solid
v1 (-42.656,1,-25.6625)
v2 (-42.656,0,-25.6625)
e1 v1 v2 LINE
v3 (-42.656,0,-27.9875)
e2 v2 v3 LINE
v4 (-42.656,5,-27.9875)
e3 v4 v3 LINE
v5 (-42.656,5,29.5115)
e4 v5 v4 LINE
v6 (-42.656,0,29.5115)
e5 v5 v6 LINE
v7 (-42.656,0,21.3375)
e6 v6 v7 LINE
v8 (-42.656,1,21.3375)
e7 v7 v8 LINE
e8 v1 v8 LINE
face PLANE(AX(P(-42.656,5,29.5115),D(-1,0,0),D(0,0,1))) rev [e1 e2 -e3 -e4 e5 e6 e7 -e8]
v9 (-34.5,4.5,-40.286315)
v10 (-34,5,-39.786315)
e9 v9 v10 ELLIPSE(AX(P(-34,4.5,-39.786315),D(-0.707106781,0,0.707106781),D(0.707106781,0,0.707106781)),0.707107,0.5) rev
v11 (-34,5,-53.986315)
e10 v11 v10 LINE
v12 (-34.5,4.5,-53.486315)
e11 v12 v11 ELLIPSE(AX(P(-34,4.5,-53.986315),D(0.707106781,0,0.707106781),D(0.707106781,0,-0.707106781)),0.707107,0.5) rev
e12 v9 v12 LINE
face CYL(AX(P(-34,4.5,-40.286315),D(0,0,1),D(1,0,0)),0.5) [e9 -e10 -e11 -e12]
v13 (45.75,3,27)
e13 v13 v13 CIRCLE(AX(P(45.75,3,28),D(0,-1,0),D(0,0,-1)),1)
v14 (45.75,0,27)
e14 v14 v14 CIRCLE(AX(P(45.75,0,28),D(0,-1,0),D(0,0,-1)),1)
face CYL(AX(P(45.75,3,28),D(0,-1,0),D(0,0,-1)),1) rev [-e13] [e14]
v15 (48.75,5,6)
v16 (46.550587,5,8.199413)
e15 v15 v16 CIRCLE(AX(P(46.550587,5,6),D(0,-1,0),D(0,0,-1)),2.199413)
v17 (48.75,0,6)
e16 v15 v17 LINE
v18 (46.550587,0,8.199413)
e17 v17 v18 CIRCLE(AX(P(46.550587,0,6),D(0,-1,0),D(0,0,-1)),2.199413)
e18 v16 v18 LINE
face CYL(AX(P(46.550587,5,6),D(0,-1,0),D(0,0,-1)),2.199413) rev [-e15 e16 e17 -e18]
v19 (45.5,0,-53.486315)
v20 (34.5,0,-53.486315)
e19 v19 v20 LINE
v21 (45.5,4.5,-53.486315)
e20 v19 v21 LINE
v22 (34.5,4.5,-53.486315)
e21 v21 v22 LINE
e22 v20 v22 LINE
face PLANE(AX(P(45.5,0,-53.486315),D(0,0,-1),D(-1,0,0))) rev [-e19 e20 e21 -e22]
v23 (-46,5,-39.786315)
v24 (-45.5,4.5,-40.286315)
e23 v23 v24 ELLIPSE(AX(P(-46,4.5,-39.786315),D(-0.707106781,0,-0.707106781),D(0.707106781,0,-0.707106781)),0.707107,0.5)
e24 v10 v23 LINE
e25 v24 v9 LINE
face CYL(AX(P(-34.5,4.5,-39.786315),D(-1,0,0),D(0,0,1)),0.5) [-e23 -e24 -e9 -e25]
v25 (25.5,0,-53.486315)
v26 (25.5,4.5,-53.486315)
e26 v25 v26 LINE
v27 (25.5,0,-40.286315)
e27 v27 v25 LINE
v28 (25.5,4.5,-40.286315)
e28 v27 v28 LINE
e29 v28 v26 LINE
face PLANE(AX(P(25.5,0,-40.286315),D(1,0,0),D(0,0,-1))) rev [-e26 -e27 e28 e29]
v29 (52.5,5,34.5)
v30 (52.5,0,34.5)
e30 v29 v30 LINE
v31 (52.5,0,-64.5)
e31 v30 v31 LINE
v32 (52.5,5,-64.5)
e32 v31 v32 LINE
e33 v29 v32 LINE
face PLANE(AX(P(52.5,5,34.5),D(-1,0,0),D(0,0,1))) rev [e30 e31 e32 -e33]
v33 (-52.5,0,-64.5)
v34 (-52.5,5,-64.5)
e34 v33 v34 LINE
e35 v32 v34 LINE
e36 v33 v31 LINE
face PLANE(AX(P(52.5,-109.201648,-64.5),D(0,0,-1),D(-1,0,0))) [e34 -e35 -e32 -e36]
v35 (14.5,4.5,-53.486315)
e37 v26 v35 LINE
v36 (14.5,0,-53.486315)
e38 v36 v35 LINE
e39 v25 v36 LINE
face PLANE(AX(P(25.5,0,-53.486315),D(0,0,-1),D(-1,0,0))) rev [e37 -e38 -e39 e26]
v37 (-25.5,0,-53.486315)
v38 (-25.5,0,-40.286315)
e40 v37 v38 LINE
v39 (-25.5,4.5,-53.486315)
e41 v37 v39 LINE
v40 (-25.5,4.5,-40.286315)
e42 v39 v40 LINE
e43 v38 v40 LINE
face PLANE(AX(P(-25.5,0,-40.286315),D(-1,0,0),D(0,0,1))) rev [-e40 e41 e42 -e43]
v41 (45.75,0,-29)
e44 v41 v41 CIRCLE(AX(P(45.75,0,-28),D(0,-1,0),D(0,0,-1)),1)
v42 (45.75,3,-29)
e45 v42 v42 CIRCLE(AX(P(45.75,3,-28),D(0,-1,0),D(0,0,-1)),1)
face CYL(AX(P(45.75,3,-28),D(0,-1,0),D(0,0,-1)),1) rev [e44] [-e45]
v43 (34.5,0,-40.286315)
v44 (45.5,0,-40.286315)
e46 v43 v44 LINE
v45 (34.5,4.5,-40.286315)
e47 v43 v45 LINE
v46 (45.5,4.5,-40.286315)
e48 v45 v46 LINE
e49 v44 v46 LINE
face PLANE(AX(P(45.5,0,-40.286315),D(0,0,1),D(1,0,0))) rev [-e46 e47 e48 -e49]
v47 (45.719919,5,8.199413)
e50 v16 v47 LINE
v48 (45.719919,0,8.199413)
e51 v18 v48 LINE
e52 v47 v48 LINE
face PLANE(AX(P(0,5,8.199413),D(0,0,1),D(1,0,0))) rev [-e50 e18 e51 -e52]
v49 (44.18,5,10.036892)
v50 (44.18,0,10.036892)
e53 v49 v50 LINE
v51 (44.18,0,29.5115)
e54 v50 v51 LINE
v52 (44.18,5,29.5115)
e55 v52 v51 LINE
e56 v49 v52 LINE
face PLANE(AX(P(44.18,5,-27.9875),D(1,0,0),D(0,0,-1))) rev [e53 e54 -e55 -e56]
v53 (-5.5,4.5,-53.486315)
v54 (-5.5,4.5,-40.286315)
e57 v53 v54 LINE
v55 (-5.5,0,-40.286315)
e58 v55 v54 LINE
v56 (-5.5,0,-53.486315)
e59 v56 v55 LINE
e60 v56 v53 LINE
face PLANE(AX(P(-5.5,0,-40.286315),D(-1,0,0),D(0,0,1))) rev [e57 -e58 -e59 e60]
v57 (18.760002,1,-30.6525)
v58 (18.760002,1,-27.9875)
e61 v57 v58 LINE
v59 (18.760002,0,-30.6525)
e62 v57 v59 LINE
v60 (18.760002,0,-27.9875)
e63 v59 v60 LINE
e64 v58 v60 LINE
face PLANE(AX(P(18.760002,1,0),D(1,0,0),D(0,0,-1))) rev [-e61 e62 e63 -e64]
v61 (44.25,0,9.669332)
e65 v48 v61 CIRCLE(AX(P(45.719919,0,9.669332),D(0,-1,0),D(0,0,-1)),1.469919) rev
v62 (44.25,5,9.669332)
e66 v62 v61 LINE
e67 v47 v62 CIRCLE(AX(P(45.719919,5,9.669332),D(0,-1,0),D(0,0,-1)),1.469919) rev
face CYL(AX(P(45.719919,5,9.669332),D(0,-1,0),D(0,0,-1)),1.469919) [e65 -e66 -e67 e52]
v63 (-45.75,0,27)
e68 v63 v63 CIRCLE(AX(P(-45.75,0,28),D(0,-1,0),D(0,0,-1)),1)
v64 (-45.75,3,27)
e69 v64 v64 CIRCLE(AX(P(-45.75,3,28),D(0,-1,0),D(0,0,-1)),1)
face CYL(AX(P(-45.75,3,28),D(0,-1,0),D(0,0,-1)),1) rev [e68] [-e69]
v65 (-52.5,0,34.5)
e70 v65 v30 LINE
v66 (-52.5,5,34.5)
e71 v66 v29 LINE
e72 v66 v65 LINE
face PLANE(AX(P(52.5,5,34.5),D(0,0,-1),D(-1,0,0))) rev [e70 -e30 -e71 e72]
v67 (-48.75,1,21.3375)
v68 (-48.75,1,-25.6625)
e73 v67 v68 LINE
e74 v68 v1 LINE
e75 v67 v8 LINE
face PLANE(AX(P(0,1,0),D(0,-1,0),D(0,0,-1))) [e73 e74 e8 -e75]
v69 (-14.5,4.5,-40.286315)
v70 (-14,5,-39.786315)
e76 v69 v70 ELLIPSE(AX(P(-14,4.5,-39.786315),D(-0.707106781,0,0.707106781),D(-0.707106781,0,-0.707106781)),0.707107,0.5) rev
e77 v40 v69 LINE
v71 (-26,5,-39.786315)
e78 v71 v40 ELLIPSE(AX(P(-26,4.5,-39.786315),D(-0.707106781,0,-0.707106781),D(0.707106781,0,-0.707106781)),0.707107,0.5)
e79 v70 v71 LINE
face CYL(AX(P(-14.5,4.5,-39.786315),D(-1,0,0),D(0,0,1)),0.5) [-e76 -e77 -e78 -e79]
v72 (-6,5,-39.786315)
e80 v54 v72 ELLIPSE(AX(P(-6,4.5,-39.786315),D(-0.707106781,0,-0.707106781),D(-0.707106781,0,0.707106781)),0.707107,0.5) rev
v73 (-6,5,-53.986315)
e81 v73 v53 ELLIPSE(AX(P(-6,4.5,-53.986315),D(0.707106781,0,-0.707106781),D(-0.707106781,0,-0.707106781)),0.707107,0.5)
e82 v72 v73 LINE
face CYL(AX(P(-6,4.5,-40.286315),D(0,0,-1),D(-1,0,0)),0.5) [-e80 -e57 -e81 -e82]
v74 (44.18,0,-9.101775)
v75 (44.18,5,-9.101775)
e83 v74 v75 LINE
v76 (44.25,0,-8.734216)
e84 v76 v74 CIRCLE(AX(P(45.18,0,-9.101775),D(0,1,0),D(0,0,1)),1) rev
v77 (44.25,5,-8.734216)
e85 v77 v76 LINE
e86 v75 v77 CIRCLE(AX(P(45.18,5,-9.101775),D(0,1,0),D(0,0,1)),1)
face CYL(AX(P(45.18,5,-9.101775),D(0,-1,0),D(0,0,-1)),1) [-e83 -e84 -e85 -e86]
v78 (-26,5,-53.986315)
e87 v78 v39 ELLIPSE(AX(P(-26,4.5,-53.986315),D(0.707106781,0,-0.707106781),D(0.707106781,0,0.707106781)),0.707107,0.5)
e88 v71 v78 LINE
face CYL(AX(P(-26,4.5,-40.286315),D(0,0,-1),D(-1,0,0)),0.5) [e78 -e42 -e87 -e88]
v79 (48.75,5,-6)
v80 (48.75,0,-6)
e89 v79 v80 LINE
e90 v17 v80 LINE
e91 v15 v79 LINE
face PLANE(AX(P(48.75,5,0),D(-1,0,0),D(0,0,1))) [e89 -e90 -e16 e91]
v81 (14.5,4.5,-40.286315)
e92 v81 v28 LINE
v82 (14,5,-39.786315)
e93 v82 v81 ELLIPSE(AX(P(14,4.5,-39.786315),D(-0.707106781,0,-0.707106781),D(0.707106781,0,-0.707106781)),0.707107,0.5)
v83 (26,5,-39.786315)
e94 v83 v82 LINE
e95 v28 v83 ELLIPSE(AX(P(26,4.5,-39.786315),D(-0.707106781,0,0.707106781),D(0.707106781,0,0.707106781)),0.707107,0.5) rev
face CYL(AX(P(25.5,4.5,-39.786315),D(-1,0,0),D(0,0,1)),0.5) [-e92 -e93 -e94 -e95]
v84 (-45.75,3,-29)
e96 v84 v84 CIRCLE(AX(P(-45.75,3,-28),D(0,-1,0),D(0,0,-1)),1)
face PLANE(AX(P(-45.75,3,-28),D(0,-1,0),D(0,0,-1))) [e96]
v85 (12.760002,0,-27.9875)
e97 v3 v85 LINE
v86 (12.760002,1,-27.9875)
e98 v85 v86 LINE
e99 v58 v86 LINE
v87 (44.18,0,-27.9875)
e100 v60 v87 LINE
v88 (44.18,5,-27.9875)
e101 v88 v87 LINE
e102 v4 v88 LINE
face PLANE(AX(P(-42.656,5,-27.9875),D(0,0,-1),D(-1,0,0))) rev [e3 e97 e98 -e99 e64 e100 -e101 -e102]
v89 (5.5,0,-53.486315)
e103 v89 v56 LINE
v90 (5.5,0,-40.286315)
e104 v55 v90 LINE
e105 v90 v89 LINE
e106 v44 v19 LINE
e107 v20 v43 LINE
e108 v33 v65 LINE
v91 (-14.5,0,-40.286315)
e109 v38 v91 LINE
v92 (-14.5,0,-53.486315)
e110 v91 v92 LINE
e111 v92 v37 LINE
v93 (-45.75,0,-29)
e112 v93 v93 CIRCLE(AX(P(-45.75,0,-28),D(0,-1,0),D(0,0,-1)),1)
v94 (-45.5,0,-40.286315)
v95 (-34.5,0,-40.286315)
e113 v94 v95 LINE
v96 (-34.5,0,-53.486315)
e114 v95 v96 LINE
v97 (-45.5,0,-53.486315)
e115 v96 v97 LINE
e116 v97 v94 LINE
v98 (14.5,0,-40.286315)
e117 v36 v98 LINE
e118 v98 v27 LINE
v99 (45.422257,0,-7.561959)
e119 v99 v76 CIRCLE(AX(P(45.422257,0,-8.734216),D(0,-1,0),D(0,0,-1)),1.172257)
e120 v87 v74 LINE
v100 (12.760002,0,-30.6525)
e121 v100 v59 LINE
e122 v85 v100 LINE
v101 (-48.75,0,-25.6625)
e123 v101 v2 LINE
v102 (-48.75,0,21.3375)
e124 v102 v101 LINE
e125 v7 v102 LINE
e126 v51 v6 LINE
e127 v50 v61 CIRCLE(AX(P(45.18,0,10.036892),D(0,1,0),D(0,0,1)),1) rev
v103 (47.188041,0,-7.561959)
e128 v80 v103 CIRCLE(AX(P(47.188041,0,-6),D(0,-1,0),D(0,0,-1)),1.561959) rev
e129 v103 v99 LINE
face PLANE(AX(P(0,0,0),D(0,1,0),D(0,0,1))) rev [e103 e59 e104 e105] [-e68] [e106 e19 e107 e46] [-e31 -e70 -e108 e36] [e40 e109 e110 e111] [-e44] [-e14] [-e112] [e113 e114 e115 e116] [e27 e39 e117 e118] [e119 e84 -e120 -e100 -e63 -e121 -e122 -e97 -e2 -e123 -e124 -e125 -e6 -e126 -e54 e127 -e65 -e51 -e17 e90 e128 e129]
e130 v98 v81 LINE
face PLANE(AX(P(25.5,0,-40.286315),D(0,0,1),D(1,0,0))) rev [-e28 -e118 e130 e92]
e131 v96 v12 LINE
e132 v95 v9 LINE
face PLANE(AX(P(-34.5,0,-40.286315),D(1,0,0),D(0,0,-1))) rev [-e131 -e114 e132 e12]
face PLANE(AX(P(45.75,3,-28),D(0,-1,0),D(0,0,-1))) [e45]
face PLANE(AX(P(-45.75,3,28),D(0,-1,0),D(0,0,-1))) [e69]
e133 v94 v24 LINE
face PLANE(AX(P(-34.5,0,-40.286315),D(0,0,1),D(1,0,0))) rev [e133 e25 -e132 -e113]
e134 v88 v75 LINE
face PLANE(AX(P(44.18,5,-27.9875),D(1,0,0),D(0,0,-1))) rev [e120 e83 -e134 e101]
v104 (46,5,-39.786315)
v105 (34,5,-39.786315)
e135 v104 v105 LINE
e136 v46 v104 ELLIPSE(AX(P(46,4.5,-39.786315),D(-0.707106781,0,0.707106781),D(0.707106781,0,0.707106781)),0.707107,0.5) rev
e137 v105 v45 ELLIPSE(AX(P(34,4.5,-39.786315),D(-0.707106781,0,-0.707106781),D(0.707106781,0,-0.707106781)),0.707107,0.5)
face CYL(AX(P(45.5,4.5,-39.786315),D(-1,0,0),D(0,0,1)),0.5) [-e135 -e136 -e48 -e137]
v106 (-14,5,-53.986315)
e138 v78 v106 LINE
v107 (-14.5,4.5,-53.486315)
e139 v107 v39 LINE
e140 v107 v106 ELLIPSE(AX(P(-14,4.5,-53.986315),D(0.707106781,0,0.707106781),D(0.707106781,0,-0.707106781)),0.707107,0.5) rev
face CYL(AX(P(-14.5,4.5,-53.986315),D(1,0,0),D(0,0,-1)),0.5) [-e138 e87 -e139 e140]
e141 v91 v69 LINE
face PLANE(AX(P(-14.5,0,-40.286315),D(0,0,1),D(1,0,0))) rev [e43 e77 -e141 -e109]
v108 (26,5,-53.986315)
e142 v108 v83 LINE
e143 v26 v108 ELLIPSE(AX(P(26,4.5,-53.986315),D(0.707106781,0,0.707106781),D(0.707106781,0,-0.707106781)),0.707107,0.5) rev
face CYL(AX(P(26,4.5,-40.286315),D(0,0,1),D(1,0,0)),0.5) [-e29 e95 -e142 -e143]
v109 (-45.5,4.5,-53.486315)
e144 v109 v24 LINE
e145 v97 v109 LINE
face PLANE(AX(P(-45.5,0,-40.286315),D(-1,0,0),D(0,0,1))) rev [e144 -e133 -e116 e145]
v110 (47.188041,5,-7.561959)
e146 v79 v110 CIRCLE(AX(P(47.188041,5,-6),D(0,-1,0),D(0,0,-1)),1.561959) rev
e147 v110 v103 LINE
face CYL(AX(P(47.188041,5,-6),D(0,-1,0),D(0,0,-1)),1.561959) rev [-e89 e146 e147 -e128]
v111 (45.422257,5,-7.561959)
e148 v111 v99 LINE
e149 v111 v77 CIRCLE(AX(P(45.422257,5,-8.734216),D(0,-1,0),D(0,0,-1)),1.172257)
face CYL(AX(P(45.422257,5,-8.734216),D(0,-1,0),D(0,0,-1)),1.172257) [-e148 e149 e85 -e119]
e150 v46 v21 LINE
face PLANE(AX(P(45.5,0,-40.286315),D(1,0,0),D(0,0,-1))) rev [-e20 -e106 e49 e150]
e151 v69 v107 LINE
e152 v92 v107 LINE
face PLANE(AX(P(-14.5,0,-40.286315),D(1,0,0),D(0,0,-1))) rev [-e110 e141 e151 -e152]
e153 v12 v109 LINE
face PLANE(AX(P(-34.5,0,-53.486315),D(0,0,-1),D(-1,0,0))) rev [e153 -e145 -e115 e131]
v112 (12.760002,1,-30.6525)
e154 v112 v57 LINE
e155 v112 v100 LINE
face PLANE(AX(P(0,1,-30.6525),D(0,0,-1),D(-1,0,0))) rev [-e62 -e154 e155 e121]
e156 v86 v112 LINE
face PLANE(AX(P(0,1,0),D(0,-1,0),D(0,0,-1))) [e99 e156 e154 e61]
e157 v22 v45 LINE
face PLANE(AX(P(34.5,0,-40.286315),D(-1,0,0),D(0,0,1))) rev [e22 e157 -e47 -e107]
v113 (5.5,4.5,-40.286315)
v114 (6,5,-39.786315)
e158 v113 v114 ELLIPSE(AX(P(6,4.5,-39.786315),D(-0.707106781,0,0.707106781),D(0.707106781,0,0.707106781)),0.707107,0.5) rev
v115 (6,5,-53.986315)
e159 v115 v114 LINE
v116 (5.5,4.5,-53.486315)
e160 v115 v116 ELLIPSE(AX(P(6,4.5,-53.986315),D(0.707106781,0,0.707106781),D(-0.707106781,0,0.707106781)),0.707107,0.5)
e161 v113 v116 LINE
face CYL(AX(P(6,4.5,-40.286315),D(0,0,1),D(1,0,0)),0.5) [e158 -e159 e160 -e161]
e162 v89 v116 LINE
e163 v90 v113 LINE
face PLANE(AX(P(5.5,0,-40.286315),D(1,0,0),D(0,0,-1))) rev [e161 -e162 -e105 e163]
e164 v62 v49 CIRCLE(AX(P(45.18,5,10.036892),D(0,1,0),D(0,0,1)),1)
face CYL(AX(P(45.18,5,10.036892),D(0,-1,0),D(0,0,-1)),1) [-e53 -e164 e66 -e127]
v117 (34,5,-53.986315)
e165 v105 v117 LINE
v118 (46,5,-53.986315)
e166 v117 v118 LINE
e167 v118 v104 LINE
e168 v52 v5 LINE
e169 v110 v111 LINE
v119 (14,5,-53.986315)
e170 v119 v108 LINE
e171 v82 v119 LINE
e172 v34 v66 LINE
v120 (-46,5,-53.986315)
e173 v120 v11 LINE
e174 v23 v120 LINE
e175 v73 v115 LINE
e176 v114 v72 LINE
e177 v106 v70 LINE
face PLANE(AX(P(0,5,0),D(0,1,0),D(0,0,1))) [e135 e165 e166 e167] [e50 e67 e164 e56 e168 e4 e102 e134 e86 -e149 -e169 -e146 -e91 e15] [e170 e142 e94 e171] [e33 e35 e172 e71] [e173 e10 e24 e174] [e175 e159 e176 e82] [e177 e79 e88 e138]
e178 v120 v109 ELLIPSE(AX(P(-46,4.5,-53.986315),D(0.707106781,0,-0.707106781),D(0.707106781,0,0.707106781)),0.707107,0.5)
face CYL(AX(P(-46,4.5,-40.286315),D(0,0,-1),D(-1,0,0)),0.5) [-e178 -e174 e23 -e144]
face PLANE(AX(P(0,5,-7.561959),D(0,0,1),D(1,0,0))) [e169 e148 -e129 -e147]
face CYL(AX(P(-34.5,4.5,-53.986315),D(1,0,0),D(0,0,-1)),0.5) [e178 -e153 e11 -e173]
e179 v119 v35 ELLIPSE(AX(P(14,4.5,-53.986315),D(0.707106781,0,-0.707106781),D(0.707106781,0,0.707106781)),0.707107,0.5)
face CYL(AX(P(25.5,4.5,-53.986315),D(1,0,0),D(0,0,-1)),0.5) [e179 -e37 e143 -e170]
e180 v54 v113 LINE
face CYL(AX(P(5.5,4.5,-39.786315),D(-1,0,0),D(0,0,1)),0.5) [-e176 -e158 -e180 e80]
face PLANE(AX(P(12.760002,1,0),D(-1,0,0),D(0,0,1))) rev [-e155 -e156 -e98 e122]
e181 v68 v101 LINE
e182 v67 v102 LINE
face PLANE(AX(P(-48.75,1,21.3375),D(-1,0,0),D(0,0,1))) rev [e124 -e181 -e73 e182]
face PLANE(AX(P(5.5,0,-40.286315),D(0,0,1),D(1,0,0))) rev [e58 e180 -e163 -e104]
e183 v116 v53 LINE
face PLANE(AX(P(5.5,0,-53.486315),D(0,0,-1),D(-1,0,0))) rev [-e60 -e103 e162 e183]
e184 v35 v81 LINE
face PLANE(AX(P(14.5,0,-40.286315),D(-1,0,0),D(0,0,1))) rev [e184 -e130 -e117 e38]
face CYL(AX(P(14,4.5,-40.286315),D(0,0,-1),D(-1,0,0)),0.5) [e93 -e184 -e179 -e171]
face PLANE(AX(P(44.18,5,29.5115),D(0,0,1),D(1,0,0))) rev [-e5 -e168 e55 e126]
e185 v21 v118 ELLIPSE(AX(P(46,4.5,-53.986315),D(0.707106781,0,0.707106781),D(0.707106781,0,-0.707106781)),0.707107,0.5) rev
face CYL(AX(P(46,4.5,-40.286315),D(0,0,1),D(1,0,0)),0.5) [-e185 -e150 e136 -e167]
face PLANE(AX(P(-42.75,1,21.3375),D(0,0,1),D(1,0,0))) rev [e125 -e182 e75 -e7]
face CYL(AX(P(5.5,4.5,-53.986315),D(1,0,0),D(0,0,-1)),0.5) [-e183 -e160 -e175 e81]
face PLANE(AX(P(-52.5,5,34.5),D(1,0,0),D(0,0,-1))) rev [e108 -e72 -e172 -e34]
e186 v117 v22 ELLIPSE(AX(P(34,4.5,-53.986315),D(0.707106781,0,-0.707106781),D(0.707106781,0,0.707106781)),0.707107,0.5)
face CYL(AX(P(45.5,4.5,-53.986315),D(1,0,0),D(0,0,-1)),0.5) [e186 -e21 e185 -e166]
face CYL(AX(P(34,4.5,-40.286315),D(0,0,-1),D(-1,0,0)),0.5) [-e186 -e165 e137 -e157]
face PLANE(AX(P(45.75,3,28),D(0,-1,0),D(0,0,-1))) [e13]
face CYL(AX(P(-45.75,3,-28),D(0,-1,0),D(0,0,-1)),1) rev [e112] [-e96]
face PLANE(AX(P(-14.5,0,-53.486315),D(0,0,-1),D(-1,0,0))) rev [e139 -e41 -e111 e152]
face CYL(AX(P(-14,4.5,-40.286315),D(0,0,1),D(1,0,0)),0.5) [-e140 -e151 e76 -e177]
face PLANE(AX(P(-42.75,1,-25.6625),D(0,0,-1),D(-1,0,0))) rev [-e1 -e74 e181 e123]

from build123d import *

# Parameters (mm, degrees)
SKETCH1_W           = 105
SKETCH1_H           = 69
BOSS_EXTRUDE1_DEPTH = 5
SKETCH2_W           = 86.836
SKETCH2_H           = 57.499
CUT_EXTRUDE1_DEPTH  = 81.210380614
CUT_EXTRUDE2_DEPTH  = 1
SKETCH4_W           = 5
SKETCH4_H           = 2.165
SKETCH4_H_2         = 0.335
CUT_EXTRUDE3_DEPTH  = 1
CUT_EXTRUDE4_DEPTH  = 81.210380614
SKETCH9_R           = 1
CUT_EXTRUDE7_DEPTH  = 3
SKETCH7_W           = 105
SKETCH7_H           = 30
BOSS_EXTRUDE2_DEPTH = 5
SKETCH8_W           = 11
SKETCH8_H           = 13.2
CUT_EXTRUDE6_DEPTH  = 84.315664794
FILLET1_R           = 0.5
FILLET3_R           = 1


with BuildPart() as part:
    # Sketch1 → Boss-Extrude1 (new body)
    with BuildSketch(Plane(origin=(0, 0, 0), x_dir=(1, 0, 0), z_dir=(0, 1, 0))):
        Rectangle(SKETCH1_W, SKETCH1_H)
    extrude(amount=BOSS_EXTRUDE1_DEPTH)

    # Sketch2 → Cut-Extrude1 (cut, through all)
    with BuildSketch(Plane(origin=(17.072113262, 0, 5.103361153), x_dir=(-1, 0, 0), z_dir=(0, -1, 0))):
        with Locations((16.310113262, 4.341361153)):
            Rectangle(SKETCH2_W, SKETCH2_H)
    extrude(amount=-CUT_EXTRUDE1_DEPTH, mode=Mode.SUBTRACT)

    # Sketch3 → Cut-Extrude2 (cut)
    with BuildSketch(Plane(origin=(17.072113262, 0, 5.103361153), x_dir=(-1, 0, 0), z_dir=(0, -1, 0))):
        Polygon((59.822113262, 30.765861153), (54.524773562, 30.765861153), (54.524773562, -16.234138847), (59.822113262, -16.234138847), (65.822113262, -16.234138847), (65.822113262, 30.765861153), align=None)
    extrude(amount=-CUT_EXTRUDE2_DEPTH, mode=Mode.SUBTRACT)

    # Sketch4 → Cut-Extrude3 (cut)
    with BuildSketch(Plane(origin=(17.072113262, 0, 5.103361153), x_dir=(-1, 0, 0), z_dir=(0, -1, 0))):
        Polygon((-1.187888405, 35.255861153), (3.812111595, 35.255861153), (3.812111595, 33.090861153), (4.312111595, 33.090861153), (4.312111595, 35.755861153), (-1.687888405, 35.755861153), (-1.687888405, 33.090861153), (-1.187888405, 33.090861153), align=None)
        with Locations((1.312111595, 34.173361153)):
            Rectangle(SKETCH4_W, SKETCH4_H)
        Polygon((4.312111595, 33.090861153), (3.812111595, 33.090861153), (3.812111595, 32.755861153), (-1.187888405, 32.755861153), (-1.187888405, 33.090861153), (-1.687888405, 33.090861153), (-1.687888405, 32.255861153), (4.312111595, 32.255861153), align=None)
        with Locations((1.312111595, 32.923361153)):
            Rectangle(SKETCH4_W, SKETCH4_H_2)
    extrude(amount=-CUT_EXTRUDE3_DEPTH, mode=Mode.SUBTRACT)

    # Sketch5 → Cut-Extrude4 (cut, through all)
    with BuildSketch(Plane(origin=(17.072113262, 0, 5.103361153), x_dir=(-1, 0, 0), z_dir=(0, -1, 0))):
        with BuildLine():
            Line((-31.677886738, -0.896638847), (-31.677886738, 11.103361153))
            ThreePointArc((-31.677886738, 11.103361153), (-31.220399504, 12.207833039), (-30.115927617, 12.665320274))
            Line((-30.115927617, 12.665320274), (-28.350143546, 12.665320274))
            ThreePointArc((-28.350143546, 12.665320274), (-27.521232808, 13.008666344), (-27.177886738, 13.837577082))
            Line((-27.177886738, 13.837577082), (-18.865935491, 13.837577082))
            Line((-18.865935491, 13.837577082), (-18.865935491, -4.56597095))
            Line((-18.865935491, -4.56597095), (-27.177886738, -4.56597095))
            ThreePointArc((-27.177886738, -4.56597095), (-27.60841615, -3.526581006), (-28.647806094, -3.096051594))
            Line((-28.647806094, -3.096051594), (-29.478473991, -3.096051594))
            ThreePointArc((-29.478473991, -3.096051594), (-31.033693659, -2.451858515), (-31.677886738, -0.896638847))
        make_face()
    extrude(amount=-CUT_EXTRUDE4_DEPTH, mode=Mode.SUBTRACT)

    # Sketch9 → Cut-Extrude7 (cut)
    with BuildSketch(Plane(origin=(17.072113262, 0, 5.103361153), x_dir=(-1, 0, 0), z_dir=(0, -1, 0))):
        with Locations(Location((-28.677886738, 33.103361153, 0), (0, 0, 90))):
            Circle(SKETCH9_R)
        with Locations(Location((62.822113262, 33.103361153, 0), (0, 0, 90))):
            Circle(SKETCH9_R)
        with Locations(Location((-28.677886738, -22.896638847, 0), (0, 0, 90))):
            Circle(SKETCH9_R)
        with Locations(Location((62.822113262, -22.896638847, 0), (0, 0, 90))):
            Circle(SKETCH9_R)
    extrude(amount=-CUT_EXTRUDE7_DEPTH, mode=Mode.SUBTRACT)

    # Sketch7 → Boss-Extrude2 (add)
    with BuildSketch(Plane(origin=(0, 5, 0), x_dir=(1, 0, 0), z_dir=(0, 1, 0))):
        with Locations((0, 49.5)):
            Rectangle(SKETCH7_W, SKETCH7_H)
    extrude(amount=-BOSS_EXTRUDE2_DEPTH)

    # Sketch8 → Cut-Extrude6 (cut, through all)
    with BuildSketch(Plane(origin=(0, 5, 0), x_dir=(1, 0, 0), z_dir=(0, 1, 0))):
        with Locations((20, 46.886314888)):
            Rectangle(SKETCH8_W, SKETCH8_H)
        with Locations((40, 46.886314888)):
            Rectangle(SKETCH8_W, SKETCH8_H)
        with Locations((0, 46.886314888)):
            Rectangle(SKETCH8_W, SKETCH8_H)
        with Locations((-20, 46.886314888)):
            Rectangle(SKETCH8_W, SKETCH8_H)
        with Locations((-40, 46.886314888)):
            Rectangle(SKETCH8_W, SKETCH8_H)
    extrude(amount=-CUT_EXTRUDE6_DEPTH, mode=Mode.SUBTRACT)

    # Fillet1
    fillet1_edges = [part.edges().sort_by_distance(p)[0] for p in [
        (34.5, 5, -46.886314888),
        (40, 5, -40.286314888),
        (45.5, 5, -46.886314888),
        (40, 5, -53.486314888),
        (20, 5, -53.486314888),
        (14.5, 5, -46.886314888),
        (20, 5, -40.286314888),
        (25.5, 5, -46.886314888),
        (0, 5, -53.486314888),
        (-5.5, 5, -46.886314888),
        (0, 5, -40.286314888),
        (5.5, 5, -46.886314888),
        (-20, 5, -53.486314888),
        (-25.5, 5, -46.886314888),
        (-20, 5, -40.286314888),
        (-14.5, 5, -46.886314888),
        (-40, 5, -53.486314888),
        (-45.5, 5, -46.886314888),
        (-40, 5, -40.286314888),
        (-34.5, 5, -46.886314888),
    ]]
    fillet(fillet1_edges, radius=FILLET1_R)

    # Fillet3
    # the kernel refuses this fillet: 1 mm, written as the material it takes off along each edge
    with BuildSketch(Plane(origin=(44.18, -0.918898797, 9.669332102), x_dir=(0, 0, 1), z_dir=(0, 1, 0)), Plane(origin=(44.18, 5.918898797, -8.734215929), x_dir=(0, 0, -1), z_dir=(0, -1, 0))) as fillet3_piece_1:
        with BuildLine():
            CenterArc((0.367559519, 1), FILLET3_R, 248.434814985, 21.565185015)
            Line((0, 0.07), (-0.00735119, 0.0514))
            ThreePointArc((-0.00735119, 0.0514), (-0.02, 0.035), (-0.02, 0))
            Line((-0.02, 0), (0, -0.02))
            Line((0, -0.02), (0.367559519, -0.02))
            Line((0.367559519, -0.02), (0.367559519, 0))
        make_face()
    extrude(amount=6.837797595, mode=Mode.SUBTRACT)


solid = part.part
